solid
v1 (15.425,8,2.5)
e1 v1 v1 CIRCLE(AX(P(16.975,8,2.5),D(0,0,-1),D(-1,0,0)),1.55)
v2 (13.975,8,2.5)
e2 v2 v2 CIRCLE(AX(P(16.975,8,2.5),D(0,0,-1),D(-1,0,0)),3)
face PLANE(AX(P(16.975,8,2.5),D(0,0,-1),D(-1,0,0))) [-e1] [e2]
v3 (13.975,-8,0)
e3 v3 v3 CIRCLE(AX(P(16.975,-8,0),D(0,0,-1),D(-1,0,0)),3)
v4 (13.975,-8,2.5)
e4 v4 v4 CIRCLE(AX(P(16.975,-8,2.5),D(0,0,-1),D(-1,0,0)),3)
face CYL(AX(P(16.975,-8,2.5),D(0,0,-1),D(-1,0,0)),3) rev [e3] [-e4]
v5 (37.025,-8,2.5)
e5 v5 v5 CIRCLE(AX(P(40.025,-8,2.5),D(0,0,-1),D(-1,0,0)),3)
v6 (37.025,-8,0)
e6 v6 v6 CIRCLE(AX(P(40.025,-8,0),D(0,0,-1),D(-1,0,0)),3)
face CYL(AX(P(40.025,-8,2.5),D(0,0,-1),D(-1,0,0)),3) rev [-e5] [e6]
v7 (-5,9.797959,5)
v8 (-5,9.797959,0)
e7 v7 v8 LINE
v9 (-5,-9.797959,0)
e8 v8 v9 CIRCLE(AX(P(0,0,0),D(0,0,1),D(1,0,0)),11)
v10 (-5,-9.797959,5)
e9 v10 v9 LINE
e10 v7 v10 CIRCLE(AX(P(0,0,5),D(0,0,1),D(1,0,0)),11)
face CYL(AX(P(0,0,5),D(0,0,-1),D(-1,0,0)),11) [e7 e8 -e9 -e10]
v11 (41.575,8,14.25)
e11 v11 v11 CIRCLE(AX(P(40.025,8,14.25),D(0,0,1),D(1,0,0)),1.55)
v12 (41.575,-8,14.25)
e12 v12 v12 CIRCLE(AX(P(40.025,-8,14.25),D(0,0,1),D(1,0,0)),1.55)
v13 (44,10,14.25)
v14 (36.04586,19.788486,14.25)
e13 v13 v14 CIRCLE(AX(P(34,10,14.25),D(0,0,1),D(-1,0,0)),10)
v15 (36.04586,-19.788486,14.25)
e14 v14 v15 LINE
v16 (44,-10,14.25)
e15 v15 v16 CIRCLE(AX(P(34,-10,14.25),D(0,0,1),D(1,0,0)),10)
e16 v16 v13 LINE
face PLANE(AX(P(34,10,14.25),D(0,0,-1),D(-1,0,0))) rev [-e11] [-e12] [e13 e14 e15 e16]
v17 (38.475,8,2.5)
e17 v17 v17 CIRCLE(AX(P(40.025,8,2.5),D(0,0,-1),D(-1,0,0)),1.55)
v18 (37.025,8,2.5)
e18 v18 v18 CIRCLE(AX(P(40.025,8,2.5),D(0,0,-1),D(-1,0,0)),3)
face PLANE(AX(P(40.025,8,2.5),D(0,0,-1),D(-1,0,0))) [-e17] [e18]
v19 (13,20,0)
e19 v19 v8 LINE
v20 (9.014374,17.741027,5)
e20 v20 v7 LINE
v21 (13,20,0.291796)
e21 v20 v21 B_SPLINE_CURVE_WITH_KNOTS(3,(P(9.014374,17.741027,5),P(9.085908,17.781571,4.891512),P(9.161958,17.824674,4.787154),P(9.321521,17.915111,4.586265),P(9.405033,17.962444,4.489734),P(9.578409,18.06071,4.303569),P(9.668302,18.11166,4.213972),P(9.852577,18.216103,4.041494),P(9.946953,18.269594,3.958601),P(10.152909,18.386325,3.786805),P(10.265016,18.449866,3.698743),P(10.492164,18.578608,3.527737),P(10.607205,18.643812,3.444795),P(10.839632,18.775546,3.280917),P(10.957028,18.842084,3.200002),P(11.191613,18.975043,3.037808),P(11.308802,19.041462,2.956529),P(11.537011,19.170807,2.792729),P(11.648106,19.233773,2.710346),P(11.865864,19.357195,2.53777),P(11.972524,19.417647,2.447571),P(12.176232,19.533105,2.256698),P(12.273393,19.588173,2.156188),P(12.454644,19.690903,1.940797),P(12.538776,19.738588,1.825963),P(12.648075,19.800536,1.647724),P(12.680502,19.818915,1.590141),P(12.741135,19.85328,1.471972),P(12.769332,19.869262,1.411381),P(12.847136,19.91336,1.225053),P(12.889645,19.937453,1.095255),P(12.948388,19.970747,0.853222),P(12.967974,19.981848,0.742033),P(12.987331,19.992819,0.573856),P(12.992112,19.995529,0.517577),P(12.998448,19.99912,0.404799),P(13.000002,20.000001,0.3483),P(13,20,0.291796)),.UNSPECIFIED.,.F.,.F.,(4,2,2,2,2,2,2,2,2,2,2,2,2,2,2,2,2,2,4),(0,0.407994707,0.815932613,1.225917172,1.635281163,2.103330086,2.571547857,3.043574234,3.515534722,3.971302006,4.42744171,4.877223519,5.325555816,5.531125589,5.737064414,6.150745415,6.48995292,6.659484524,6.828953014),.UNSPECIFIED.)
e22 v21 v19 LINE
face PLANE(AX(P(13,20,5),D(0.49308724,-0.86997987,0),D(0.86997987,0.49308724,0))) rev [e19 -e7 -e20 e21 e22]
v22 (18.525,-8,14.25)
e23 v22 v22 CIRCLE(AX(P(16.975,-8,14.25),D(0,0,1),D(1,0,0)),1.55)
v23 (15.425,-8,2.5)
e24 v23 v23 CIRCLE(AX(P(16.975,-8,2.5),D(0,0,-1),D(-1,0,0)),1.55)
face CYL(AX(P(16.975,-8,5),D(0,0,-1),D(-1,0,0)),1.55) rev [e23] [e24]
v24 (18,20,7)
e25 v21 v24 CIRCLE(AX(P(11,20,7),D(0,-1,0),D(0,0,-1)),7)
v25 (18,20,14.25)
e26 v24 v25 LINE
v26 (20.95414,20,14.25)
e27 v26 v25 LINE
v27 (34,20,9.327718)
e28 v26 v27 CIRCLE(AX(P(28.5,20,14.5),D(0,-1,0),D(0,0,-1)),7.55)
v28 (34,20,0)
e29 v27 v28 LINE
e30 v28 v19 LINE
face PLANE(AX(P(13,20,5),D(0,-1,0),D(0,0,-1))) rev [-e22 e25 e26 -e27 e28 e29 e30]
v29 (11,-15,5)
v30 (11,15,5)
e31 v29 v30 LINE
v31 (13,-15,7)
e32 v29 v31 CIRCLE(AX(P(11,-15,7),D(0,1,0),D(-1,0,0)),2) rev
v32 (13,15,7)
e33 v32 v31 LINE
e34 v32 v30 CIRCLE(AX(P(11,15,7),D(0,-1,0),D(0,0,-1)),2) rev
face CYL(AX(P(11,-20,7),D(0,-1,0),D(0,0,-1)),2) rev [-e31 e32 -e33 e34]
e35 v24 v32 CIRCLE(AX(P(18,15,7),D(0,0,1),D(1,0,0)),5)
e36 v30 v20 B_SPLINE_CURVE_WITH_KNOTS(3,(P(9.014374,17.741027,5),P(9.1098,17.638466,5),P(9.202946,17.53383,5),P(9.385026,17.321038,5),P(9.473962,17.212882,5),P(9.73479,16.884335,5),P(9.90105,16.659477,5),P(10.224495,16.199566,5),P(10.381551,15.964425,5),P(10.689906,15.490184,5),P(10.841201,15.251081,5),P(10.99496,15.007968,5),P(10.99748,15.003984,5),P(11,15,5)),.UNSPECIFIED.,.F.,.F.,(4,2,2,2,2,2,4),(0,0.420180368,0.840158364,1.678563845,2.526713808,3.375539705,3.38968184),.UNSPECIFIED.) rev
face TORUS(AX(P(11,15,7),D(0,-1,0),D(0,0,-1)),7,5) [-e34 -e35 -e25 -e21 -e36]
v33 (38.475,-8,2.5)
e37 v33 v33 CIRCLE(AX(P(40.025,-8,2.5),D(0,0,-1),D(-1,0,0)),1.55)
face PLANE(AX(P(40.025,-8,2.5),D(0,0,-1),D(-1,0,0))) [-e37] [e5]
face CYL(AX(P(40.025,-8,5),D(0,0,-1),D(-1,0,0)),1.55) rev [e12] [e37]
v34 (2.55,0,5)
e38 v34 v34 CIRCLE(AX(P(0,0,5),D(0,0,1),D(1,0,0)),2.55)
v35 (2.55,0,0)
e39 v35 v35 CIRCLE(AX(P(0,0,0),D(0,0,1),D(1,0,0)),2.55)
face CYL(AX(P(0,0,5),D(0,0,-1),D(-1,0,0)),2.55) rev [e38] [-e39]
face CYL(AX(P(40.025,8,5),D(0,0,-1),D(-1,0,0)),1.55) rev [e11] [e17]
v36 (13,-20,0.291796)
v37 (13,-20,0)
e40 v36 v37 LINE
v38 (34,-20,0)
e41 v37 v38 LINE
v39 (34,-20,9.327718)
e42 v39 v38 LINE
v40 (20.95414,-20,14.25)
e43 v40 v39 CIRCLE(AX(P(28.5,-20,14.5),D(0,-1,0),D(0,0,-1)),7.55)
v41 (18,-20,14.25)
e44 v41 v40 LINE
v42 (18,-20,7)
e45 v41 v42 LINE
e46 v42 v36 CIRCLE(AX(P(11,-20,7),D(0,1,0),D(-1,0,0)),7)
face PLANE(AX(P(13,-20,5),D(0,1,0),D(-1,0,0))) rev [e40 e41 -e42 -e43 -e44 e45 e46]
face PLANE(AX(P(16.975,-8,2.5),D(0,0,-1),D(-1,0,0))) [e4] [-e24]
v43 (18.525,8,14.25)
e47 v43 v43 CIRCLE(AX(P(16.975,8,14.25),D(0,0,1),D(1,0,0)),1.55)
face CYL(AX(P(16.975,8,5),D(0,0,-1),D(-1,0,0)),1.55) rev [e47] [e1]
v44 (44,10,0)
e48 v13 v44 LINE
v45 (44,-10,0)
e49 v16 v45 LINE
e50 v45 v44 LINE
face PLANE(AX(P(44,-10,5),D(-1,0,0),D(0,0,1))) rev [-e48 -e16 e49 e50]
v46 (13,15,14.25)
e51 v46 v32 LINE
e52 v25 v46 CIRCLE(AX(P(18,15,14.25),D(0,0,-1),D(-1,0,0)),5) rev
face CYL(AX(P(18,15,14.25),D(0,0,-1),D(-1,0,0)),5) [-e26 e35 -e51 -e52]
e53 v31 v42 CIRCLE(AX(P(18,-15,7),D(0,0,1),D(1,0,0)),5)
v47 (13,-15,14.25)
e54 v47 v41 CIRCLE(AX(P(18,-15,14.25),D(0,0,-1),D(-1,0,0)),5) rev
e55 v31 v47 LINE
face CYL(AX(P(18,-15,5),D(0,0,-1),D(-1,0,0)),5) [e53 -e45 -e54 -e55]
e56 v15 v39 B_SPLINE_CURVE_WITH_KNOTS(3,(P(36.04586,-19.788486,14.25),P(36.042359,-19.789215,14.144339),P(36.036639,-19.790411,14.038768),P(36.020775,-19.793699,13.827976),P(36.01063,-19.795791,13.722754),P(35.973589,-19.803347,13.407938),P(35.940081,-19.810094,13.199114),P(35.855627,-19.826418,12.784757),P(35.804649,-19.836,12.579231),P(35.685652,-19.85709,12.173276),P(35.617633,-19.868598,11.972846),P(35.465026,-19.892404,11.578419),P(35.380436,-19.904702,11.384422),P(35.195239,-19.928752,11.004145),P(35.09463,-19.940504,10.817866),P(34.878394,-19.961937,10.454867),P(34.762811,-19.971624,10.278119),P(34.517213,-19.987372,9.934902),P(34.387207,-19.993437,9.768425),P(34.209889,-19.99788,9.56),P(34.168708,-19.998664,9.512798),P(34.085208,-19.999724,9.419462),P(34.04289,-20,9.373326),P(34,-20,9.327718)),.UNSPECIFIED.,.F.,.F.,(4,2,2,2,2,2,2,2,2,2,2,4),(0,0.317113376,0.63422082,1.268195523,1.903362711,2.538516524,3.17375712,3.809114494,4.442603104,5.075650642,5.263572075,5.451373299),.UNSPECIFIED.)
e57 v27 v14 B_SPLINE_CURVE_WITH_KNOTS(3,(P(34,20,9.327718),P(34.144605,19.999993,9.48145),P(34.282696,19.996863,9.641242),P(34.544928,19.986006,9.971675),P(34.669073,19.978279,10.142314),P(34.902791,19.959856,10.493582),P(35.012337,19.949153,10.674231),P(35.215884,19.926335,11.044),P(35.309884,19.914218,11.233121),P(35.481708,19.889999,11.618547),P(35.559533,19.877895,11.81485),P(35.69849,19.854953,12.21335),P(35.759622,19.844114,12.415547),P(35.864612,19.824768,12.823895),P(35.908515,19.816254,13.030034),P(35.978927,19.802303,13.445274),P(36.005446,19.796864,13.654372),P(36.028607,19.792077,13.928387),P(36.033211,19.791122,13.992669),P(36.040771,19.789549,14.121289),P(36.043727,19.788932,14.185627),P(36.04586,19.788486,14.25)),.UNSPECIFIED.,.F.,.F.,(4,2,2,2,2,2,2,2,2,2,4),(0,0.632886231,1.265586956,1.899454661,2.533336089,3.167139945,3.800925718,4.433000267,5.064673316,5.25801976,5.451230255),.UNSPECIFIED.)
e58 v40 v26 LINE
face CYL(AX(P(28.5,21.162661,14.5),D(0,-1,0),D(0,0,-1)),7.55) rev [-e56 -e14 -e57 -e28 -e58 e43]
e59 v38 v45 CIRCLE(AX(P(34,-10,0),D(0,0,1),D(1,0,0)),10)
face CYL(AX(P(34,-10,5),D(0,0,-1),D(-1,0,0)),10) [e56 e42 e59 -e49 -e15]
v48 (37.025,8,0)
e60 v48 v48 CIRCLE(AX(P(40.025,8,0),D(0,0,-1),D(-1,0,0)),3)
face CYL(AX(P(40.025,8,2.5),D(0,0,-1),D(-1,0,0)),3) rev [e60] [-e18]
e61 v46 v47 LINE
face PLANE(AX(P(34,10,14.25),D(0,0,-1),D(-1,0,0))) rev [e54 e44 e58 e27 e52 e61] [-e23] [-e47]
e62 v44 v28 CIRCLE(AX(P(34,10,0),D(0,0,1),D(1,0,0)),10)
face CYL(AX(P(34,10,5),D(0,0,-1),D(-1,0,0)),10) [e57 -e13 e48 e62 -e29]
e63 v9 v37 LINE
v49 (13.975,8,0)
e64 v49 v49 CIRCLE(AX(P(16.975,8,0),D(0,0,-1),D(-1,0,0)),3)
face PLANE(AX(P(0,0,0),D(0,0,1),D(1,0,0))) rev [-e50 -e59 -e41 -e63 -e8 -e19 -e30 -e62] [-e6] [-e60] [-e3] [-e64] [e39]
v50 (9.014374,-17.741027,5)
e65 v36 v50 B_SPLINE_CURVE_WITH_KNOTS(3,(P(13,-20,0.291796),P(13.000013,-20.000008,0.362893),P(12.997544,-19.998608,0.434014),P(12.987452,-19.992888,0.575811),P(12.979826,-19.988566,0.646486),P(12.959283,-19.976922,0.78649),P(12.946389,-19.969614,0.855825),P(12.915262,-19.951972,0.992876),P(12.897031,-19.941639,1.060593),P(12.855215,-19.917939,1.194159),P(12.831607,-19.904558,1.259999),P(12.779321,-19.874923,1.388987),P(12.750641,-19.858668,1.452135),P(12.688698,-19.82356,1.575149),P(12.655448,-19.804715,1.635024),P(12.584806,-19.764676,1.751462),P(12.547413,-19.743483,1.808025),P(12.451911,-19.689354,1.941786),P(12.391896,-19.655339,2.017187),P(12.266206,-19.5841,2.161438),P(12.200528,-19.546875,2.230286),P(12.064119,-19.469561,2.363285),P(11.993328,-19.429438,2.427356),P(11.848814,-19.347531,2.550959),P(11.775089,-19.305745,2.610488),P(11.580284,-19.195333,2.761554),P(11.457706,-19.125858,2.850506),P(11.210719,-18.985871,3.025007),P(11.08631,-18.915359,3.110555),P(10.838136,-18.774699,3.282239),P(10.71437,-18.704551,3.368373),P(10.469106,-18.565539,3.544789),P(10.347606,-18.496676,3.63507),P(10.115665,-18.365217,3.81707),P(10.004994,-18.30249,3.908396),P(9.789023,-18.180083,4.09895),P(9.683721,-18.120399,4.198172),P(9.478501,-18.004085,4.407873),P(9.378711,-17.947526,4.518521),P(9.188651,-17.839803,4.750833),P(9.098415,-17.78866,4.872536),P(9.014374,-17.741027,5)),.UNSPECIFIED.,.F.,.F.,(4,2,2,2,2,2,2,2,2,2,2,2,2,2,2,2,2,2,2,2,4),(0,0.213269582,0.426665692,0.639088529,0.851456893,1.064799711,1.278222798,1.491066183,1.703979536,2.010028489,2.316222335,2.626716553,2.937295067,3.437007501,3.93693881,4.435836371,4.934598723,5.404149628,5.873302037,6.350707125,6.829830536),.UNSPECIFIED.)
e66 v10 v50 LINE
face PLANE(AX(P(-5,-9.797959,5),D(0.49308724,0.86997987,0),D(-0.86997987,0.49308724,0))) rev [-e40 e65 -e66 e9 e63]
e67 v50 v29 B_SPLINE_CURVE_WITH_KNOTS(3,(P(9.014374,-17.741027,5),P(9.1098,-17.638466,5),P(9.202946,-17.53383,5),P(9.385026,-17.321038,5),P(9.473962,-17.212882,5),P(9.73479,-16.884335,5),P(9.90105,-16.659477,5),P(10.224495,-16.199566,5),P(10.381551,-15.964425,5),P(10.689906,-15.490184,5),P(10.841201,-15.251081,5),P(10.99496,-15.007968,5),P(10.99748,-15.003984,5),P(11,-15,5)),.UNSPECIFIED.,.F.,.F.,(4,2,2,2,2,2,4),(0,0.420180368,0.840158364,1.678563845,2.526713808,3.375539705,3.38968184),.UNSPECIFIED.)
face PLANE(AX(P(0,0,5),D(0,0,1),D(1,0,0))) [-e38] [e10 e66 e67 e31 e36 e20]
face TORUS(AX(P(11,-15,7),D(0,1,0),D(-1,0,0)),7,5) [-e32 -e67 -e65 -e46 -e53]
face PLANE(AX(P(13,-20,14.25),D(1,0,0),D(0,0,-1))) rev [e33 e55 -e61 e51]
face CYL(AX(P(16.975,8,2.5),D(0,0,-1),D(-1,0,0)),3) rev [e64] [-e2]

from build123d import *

# Parameters (mm, degrees)
SKETCH_3_R          = 2.55
SKETCH_3_R_2        = 1.55
EXTRUDE_1_DEPTH     = 5
SKETCH_4_R          = 1.55
EXTRUDE_2_DEPTH     = 9.25
FILLET_1_R          = 2
FILLET_START        = 6.9999999
FILLET_2_2_DEPTH    = 8.0000001
SKETCH_5_R          = 3
CUT_EXTRUDE_1_DEPTH = 2.5
SKETCH_6_R          = 7.55
CUT_EXTRUDE_2_DEPTH = 62.147874109


with BuildPart() as part:
    # 草图3 → 凸台-拉伸1 (new body)
    with BuildSketch(Plane.XY):
        with BuildLine():
            Line((13, 20), (34, 20))
            ThreePointArc((34, 20), (41.071067812, 17.071067812), (44, 10))
            Line((44, 10), (44, -10))
            ThreePointArc((44, -10), (41.071067812, -17.071067812), (34, -20))
            Line((34, -20), (13, -20))
            Line((13, -20), (-5, -9.797958971))
            ThreePointArc((-5, -9.797958971), (-11, 0), (-5, 9.797958971))
            Line((-5, 9.797958971), (13, 20))
        make_face()
        Circle(SKETCH_3_R, mode=Mode.SUBTRACT)
        with Locations((40.025, 8)):
            Circle(SKETCH_3_R_2, mode=Mode.SUBTRACT)
        with Locations((40.025, -8)):
            Circle(SKETCH_3_R_2, mode=Mode.SUBTRACT)
        with Locations((16.975, -8)):
            Circle(SKETCH_3_R_2, mode=Mode.SUBTRACT)
        with Locations((16.975, 8)):
            Circle(SKETCH_3_R_2, mode=Mode.SUBTRACT)
    extrude(amount=EXTRUDE_1_DEPTH)

    # 草图4 → 凸台-拉伸2 (add)
    with BuildSketch(Plane.XY.offset(5)):
        with BuildLine():
            Line((13, 20), (34, 20))
            ThreePointArc((34, 20), (41.071067812, 17.071067812), (44, 10))
            Line((44, 10), (44, -10))
            ThreePointArc((44, -10), (41.071067812, -17.071067812), (34, -20))
            Line((34, -20), (13, -20))
            Line((13, -20), (13, 20))
        make_face()
        with Locations((16.975, -8)):
            Circle(SKETCH_4_R, mode=Mode.SUBTRACT)
        with Locations((16.975, 8)):
            Circle(SKETCH_4_R, mode=Mode.SUBTRACT)
        with Locations((40.025, 8)):
            Circle(SKETCH_4_R, mode=Mode.SUBTRACT)
        with Locations((40.025, -8)):
            Circle(SKETCH_4_R, mode=Mode.SUBTRACT)
    extrude(amount=EXTRUDE_2_DEPTH)

    # 圆角1
    fillet_1_edges = [part.edges().sort_by_distance(p)[0] for p in [
        (13, 0, 5),
    ]]
    fillet(fillet_1_edges, radius=FILLET_1_R)

    # 圆角2: read off the stored shape, not the designer's step
    # 圆角2 outline → 圆角2 (revolve, cut)
    with BuildSketch(Plane(origin=(11, 0, 7), x_dir=(1, 0, 0), z_dir=(0, 0, 1))):
        with BuildLine():
            ThreePointArc((7, -20), (3.464466094, -18.535533906), (2, -15))
            Line((2, -15), (2, -20))
            Line((2, -20), (7, -20))
        make_face()
        with BuildLine():
            Line((2, 20), (2, 15))
            ThreePointArc((2, 15), (3.464466094, 18.535533906), (7, 20))
            Line((7, 20), (2, 20))
        make_face()
    revolve(axis=Axis((11, 0, 7), (0, 1, 0)), mode=Mode.SUBTRACT)

    # Fillet 2 2 outline → Fillet 2 2 (cut)
    with BuildSketch(Plane.XY.offset(FILLET_START)):
        with BuildLine():
            Line((13, -20), (18, -20))
            ThreePointArc((18, -20), (14.464466094, -18.535533906), (13, -15))
            Line((13, -15), (13, -20))
        make_face()
        with BuildLine():
            Line((13, 20), (13, 15))
            ThreePointArc((13, 15), (14.464466094, 18.535533906), (18, 20))
            Line((18, 20), (13, 20))
        make_face()
    extrude(amount=FILLET_2_2_DEPTH, mode=Mode.SUBTRACT)

    # 草图5 → 切除-拉伸1 (cut)
    with BuildSketch(Plane(origin=(0, 0, 0), x_dir=(-1, 0, 0), z_dir=(0, 0, -1))):
        with Locations((-40.025, 8)):
            Circle(SKETCH_5_R)
        with Locations((-16.975, 8)):
            Circle(SKETCH_5_R)
        with Locations((-16.975, -8)):
            Circle(SKETCH_5_R)
        with Locations((-40.025, -8)):
            Circle(SKETCH_5_R)
    extrude(amount=-CUT_EXTRUDE_1_DEPTH, mode=Mode.SUBTRACT)

    # 草图6 → 切除-拉伸2 (cut, through all)
    with BuildSketch(Plane.XZ.offset(20)):
        with Locations((28.5, 14.5)):
            Circle(SKETCH_6_R)
    extrude(amount=-CUT_EXTRUDE_2_DEPTH, mode=Mode.SUBTRACT)


solid = part.part
